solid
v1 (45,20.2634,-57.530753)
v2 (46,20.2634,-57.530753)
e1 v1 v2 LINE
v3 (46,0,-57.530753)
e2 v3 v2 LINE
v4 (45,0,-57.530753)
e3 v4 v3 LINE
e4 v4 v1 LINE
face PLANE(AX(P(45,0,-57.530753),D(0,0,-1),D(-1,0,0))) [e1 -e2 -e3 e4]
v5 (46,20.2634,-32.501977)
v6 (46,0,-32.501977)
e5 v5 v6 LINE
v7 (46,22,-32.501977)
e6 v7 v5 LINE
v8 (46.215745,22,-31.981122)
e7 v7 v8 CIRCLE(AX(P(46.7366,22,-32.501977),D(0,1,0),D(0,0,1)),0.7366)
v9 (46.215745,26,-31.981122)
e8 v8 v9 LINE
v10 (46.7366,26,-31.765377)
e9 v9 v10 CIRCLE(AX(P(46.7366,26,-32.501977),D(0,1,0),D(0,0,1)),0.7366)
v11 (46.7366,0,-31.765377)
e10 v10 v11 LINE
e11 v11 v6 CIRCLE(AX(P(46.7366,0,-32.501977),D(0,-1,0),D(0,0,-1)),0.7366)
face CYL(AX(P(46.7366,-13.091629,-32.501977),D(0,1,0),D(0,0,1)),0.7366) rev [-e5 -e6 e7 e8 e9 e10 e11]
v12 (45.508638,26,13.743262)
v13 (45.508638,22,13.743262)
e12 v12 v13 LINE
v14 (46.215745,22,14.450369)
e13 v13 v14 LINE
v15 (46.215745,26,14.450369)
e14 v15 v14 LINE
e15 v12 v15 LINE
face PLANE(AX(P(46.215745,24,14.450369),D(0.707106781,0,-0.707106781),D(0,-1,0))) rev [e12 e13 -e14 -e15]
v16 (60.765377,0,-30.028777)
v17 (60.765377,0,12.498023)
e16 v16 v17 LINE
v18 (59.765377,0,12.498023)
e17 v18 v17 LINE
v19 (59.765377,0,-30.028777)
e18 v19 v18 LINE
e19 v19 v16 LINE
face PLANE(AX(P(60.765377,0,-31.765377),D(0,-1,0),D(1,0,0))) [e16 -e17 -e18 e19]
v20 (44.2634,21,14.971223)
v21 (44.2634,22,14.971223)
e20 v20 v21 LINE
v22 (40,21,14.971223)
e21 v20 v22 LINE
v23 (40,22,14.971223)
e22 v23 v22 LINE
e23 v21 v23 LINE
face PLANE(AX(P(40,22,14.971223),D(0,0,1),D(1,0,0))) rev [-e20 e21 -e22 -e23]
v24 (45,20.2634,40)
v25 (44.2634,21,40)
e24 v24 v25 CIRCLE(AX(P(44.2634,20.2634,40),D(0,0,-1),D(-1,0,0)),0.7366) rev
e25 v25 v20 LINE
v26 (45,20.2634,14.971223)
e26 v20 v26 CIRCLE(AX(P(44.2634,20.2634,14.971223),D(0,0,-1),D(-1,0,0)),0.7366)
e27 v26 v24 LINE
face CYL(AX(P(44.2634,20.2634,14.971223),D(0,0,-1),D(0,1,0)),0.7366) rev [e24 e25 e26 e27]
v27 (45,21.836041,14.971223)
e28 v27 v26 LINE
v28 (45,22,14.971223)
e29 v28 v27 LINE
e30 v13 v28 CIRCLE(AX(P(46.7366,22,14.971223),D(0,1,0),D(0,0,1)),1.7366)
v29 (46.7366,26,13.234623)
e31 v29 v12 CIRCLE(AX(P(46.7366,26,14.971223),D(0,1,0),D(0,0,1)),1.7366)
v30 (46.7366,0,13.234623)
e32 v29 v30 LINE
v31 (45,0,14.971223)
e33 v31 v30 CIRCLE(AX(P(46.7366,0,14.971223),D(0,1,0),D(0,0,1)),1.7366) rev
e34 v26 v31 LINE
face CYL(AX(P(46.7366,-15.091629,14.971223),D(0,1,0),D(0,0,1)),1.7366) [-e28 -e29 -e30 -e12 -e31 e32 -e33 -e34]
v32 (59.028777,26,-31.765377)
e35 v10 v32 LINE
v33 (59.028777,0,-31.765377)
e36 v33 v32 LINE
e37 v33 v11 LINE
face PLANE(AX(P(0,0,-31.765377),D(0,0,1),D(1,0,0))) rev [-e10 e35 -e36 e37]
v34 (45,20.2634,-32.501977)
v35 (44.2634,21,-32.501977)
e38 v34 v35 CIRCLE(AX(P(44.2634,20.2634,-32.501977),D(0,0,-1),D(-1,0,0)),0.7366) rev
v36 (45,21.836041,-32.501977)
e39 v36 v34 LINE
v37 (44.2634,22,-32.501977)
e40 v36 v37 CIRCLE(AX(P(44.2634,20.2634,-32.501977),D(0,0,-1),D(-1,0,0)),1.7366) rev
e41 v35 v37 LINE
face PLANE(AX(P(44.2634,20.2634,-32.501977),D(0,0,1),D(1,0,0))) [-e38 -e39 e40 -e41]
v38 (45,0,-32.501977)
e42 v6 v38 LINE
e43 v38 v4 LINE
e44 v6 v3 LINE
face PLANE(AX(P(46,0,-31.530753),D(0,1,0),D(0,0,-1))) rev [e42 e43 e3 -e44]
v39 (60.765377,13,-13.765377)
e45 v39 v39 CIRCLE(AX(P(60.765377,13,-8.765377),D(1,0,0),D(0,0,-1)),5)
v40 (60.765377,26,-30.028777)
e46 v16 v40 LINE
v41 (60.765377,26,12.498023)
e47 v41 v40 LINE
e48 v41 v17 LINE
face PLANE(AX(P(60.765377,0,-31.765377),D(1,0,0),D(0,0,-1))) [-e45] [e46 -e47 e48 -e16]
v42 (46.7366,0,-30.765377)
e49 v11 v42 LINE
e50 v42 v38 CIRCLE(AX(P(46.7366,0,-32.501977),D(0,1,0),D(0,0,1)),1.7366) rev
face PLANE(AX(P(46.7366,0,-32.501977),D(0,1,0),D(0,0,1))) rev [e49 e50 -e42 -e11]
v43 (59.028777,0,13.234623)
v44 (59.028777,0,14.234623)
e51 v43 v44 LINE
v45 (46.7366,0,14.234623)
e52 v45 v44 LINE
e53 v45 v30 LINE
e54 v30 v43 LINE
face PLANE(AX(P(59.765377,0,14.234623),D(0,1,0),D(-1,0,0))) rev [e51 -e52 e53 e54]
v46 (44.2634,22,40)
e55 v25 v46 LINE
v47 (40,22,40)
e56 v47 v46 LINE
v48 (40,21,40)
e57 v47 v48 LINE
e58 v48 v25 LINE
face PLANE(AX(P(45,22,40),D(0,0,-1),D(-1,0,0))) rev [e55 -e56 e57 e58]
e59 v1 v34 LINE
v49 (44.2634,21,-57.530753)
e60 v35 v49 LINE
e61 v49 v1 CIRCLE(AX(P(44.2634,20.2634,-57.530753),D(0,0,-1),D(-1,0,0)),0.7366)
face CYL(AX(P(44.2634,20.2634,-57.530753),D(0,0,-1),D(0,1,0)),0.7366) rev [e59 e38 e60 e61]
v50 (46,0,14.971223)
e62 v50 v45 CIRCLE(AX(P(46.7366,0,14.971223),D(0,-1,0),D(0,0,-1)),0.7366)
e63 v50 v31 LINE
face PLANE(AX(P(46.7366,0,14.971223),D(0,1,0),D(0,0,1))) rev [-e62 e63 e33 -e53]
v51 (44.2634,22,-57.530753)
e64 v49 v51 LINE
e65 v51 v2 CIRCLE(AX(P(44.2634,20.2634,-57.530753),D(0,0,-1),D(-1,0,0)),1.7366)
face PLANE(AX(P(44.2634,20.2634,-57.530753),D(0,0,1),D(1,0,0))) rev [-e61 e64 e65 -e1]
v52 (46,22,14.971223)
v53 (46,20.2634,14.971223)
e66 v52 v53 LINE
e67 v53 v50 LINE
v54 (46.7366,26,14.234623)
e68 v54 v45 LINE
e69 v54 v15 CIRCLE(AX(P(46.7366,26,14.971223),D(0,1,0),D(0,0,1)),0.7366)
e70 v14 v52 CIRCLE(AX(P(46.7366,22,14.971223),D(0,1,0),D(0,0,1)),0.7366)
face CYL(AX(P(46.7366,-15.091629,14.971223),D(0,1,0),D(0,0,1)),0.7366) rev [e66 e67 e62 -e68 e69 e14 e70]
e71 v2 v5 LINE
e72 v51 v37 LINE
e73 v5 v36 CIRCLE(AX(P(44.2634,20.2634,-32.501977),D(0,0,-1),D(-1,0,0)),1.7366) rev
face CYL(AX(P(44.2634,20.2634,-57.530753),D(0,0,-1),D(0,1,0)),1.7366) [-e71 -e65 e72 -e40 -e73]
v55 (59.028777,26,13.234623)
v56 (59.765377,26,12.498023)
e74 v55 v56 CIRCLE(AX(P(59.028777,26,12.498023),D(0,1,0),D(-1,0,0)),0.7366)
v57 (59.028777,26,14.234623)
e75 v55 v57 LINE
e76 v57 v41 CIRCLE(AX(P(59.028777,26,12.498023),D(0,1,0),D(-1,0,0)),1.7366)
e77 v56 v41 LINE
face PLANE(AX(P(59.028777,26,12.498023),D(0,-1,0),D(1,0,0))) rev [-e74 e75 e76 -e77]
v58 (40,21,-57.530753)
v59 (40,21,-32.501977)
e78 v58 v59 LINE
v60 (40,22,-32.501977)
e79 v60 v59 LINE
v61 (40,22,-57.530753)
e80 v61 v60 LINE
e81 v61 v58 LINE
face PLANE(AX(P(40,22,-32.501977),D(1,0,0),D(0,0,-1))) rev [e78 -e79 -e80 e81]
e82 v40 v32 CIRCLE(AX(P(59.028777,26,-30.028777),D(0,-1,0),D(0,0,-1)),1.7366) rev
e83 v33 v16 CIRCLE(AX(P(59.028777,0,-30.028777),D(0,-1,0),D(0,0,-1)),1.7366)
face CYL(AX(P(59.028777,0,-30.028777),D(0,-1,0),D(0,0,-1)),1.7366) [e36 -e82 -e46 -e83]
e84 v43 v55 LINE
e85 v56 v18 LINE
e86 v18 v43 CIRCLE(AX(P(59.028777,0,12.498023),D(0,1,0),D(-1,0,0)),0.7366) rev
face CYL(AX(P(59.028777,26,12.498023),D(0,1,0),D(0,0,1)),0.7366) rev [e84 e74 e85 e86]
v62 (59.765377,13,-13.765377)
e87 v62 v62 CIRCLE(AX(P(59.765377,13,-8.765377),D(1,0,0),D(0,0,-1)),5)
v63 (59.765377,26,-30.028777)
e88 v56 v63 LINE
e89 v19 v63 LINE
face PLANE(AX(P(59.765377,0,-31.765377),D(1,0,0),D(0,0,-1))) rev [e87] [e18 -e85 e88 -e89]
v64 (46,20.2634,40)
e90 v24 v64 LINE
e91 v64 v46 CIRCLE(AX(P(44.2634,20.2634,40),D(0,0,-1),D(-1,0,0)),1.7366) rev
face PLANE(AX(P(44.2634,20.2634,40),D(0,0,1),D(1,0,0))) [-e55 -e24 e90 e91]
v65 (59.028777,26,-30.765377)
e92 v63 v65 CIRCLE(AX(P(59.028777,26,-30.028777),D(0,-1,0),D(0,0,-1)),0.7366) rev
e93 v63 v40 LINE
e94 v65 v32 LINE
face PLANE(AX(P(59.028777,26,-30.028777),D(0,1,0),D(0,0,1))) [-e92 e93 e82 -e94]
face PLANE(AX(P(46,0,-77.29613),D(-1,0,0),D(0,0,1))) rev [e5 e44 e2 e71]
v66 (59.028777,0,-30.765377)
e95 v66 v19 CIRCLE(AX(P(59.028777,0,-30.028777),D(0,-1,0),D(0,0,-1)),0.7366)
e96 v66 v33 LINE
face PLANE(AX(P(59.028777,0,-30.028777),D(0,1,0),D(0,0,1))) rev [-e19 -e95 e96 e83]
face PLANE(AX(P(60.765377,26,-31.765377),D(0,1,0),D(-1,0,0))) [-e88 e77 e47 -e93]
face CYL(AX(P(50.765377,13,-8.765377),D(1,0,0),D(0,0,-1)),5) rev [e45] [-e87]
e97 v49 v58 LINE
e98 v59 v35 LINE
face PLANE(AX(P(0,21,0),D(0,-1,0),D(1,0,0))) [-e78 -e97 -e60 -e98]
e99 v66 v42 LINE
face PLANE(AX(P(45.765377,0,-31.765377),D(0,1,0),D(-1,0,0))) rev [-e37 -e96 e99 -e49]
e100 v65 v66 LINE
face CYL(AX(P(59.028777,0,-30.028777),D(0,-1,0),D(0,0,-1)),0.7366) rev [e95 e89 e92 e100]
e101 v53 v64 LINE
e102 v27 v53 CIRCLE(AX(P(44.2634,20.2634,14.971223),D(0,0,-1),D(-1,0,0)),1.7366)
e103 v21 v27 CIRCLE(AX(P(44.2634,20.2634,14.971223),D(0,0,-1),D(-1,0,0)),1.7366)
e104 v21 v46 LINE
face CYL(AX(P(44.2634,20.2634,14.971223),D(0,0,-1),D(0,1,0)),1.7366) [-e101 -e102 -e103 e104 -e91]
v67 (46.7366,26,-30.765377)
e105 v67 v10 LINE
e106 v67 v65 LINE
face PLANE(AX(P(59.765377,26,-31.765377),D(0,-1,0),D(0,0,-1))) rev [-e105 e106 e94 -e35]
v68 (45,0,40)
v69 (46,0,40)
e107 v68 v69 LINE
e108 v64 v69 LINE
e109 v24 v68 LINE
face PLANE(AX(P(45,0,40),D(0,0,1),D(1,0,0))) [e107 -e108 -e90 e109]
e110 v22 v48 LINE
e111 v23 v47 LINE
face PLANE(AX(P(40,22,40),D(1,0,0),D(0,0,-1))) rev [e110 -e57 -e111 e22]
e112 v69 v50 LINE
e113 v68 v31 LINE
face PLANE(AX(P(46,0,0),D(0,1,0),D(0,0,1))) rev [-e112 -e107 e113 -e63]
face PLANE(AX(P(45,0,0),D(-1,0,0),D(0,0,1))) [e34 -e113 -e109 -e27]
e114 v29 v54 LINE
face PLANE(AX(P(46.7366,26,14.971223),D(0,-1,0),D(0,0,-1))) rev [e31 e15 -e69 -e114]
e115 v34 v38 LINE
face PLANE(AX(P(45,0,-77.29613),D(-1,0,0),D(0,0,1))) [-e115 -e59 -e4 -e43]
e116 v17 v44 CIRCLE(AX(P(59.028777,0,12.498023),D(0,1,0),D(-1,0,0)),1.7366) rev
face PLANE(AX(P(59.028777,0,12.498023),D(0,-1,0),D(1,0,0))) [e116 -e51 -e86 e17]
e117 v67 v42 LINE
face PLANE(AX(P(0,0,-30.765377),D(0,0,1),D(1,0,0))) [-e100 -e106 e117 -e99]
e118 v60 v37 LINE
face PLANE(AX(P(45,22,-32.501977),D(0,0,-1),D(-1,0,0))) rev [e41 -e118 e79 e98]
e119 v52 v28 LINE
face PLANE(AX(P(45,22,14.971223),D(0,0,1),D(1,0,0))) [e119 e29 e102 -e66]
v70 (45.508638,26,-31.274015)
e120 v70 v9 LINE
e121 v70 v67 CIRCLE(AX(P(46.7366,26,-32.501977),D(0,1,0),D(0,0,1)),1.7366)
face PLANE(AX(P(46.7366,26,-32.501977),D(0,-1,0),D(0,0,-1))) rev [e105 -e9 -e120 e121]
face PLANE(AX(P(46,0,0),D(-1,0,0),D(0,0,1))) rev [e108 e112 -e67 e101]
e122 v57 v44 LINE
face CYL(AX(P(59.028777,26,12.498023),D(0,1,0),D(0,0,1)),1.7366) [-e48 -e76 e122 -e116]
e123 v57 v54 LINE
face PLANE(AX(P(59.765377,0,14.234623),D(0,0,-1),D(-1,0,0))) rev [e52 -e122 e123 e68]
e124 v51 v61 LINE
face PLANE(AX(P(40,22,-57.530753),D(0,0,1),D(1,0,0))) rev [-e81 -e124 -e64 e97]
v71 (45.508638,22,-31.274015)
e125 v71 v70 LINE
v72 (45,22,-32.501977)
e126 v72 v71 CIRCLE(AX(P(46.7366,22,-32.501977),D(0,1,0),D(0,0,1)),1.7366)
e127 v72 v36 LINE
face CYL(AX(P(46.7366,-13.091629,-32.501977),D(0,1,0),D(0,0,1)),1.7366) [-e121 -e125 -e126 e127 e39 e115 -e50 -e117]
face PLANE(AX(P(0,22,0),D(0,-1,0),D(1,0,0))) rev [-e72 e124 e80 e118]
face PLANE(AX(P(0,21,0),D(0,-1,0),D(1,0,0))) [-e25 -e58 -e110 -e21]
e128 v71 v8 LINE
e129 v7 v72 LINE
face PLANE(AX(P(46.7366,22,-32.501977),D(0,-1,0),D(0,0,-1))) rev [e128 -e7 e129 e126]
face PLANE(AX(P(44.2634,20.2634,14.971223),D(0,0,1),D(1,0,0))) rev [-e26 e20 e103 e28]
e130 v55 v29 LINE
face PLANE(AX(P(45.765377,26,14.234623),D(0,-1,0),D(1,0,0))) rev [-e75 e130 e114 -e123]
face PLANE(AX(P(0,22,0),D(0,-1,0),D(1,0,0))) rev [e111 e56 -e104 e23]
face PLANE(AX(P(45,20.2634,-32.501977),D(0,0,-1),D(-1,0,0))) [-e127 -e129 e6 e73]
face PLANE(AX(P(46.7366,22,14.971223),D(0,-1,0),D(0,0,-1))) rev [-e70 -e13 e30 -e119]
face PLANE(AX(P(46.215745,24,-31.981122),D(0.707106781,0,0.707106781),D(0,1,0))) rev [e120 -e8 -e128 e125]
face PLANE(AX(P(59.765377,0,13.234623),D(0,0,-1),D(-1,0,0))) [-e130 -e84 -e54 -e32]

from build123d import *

# Parameters (mm, degrees)
SKETCH17_W                   = 46
SKETCH17_H                   = 26
BASE_FLANGE4_DEPTH           = 1
EDGE_FLANGE1_STRIP_W         = 5.4732
EDGE_FLANGE1_STRIP_H         = 1
EDGE_FLANGE1_STRIP_CUT_DEPTH = 26
EDGE_FLANGE1_DEPTH           = 26
SKETCH30_W                   = 26
SKETCH30_H                   = 22
TAB1_DEPTH                   = 1
SKETCHED_BEND3_DEPTH         = 26
SKETCHED_START               = 22
SKETCHED_BEND3_2_DEPTH       = 4
SKETCHED_BEND3_3_DEPTH       = 26
SKETCHED_BEND3_4_DEPTH       = 22
EDGE_FLANGE2_STRIP_W         = 5.4732
EDGE_FLANGE2_STRIP_H         = 1
EDGE_FLANGE2_STRIP_CUT_DEPTH = 25.028776631
EDGE_FLANGE2_DEPTH           = 25.028776631
EDGE_FLANGE3_STRIP_W         = 5.4732
EDGE_FLANGE3_STRIP_H         = 1
EDGE_FLANGE3_STRIP_CUT_DEPTH = 26
EDGE_FLANGE3_DEPTH           = 26
SKETCH40_W                   = 26
SKETCH40_H                   = 22
TAB2_DEPTH                   = 1
SKETCHED_BEND4_DEPTH         = 26
SKETCHED_BEND4_2_DEPTH       = 4
SKETCHED_BEND4_3_DEPTH       = 22
SKETCHED_BEND4_4_DEPTH       = 4
EDGE_FLANGE4_STRIP_W         = 5.4732
EDGE_FLANGE4_STRIP_H         = 1
EDGE_FLANGE4_STRIP_CUT_DEPTH = 25.028776631
EDGE_FLANGE4_DEPTH           = 25.028776631
SKETCH47_R                   = 5
CUT_EXTRUDE1_DEPTH           = 10


# Read off the part's stored shape, not the designer's step: Sketched Bend3, Sketched Bend4
# Sheet-metal steps are written as plain solids
with BuildPart() as part:
    # Sketch17 → Base-Flange4 (new body)
    with BuildSketch(Plane.XY):
        with Locations((23, 13)):
            Rectangle(SKETCH17_W, SKETCH17_H)
    extrude(amount=-BASE_FLANGE4_DEPTH)

    # Edge-Flange1 strip (across the edge) → Edge-Flange1 strip cut (cut)
    with BuildSketch(Plane(origin=(46, 0, 0), x_dir=(-1, 0, 0), z_dir=(0, 1, 0))):
        with Locations((-1, -0.5)):
            Rectangle(EDGE_FLANGE1_STRIP_W, EDGE_FLANGE1_STRIP_H)
    extrude(amount=EDGE_FLANGE1_STRIP_CUT_DEPTH, mode=Mode.SUBTRACT)

    # Edge-Flange1 section (across the edge) → Edge-Flange1 (add)
    with BuildSketch(Plane(origin=(46, 0, 0), x_dir=(-1, 0, 0), z_dir=(0, 1, 0))):
        with BuildLine():
            Line((0, 0.7366), (0, 14))
            Line((0, 14), (1, 14))
            Line((1, 14), (1, 0.7366))
            ThreePointArc((1, 0.7366), (1.215745145, 0.215745145), (1.7366, 0))
            Line((1.7366, 0), (1.7366, -1))
            ThreePointArc((1.7366, -1), (0.508638364, -0.491361636), (0, 0.7366))
        make_face()
    extrude(amount=EDGE_FLANGE1_DEPTH)

    # Sketch30 → Tab1 (add)
    with BuildSketch(Plane(origin=(46, 0, 0), x_dir=(0, 0, -1), z_dir=(1, 0, 0))):
        with Locations((-27, 11)):
            Rectangle(SKETCH30_W, SKETCH30_H)
    extrude(amount=-TAB1_DEPTH)

    # Sketched Bend3 outline → Sketched Bend3 (cut)
    with BuildSketch(Plane(origin=(0, 0, 0), x_dir=(1, 0, 0), z_dir=(0, 1, 0))):
        with BuildLine():
            Line((46, -13.398582279), (46, -0.7366))
            ThreePointArc((46, -0.7366), (45.491361636, 0.491361636), (44.2634, 1))
            Line((44.2634, 1), (0, 1))
            Line((0, 1), (0, 0))
            Line((0, 0), (44.2634, 0))
            ThreePointArc((44.2634, 0), (44.784254855, -0.215745145), (45, -0.7366))
            Line((45, -0.7366), (45, -14.971223369))
            ThreePointArc((45, -14.971223369), (45.271171885, -14.039397205), (46, -13.398582279))
        make_face()
    extrude(amount=SKETCHED_BEND3_DEPTH, mode=Mode.SUBTRACT)

    # Sketched Bend3 2 outline → Sketched Bend3 2 (cut)
    with BuildSketch(Plane(origin=(0, 0, 0), x_dir=(1, 0, 0), z_dir=(0, 1, 0)).offset(SKETCHED_START)):
        with BuildLine():
            Line((45.296980354, -14), (45.765376631, -14))
            Line((45.765376631, -14), (45.508638364, -13.743261733))
            ThreePointArc((45.508638364, -13.743261733), (45.396646229, -13.866549911), (45.296980354, -14))
        make_face()
    extrude(amount=SKETCHED_BEND3_2_DEPTH, mode=Mode.SUBTRACT)

    # Sketched Bend3 3 outline → Sketched Bend3 3 (add)
    with BuildSketch(Plane(origin=(0, 0, 0), x_dir=(1, 0, 0), z_dir=(0, 1, 0))):
        with BuildLine():
            Line((46.7366, -14.234623369), (59.028776631, -14.234623369))
            ThreePointArc((59.028776631, -14.234623369), (60.256738267, -13.725985005), (60.765376631, -12.498023369))
            Line((60.765376631, -12.498023369), (60.765376631, 31.765376631))
            Line((60.765376631, 31.765376631), (59.765376631, 31.765376631))
            Line((59.765376631, 31.765376631), (59.765376631, -12.498023369))
            ThreePointArc((59.765376631, -12.498023369), (59.549631486, -13.018878224), (59.028776631, -13.234623369))
            Line((59.028776631, -13.234623369), (46.7366, -13.234623369))
            ThreePointArc((46.7366, -13.234623369), (46.359286442, -13.276108612), (46, -13.398582279))
            Line((46, -13.398582279), (46, -14))
            Line((46, -14), (45.765376631, -14))
            Line((45.765376631, -14), (46.215745145, -14.450368514))
            ThreePointArc((46.215745145, -14.450368514), (46.454715384, -14.290693705), (46.7366, -14.234623369))
        make_face()
    extrude(amount=SKETCHED_BEND3_3_DEPTH)

    # Sketched Bend3 4 outline → Sketched Bend3 4 (add)
    with BuildSketch(Plane(origin=(0, 0, 0), x_dir=(1, 0, 0), z_dir=(0, 1, 0))):
        with BuildLine():
            ThreePointArc((46, -14.971223369), (46.056070336, -14.689338753), (46.215745145, -14.450368514))
            Line((46.215745145, -14.450368514), (46, -14.234623369))
            Line((46, -14.234623369), (46, -14.971223369))
        make_face()
    extrude(amount=SKETCHED_BEND3_4_DEPTH)

    # Edge-Flange2 strip (across the edge) → Edge-Flange2 strip cut (cut)
    with BuildSketch(Plane(origin=(45, 22, 40), x_dir=(0, -1, 0), z_dir=(0, 0, -1))):
        with Locations((-1, -0.5)):
            Rectangle(EDGE_FLANGE2_STRIP_W, EDGE_FLANGE2_STRIP_H)
    extrude(amount=EDGE_FLANGE2_STRIP_CUT_DEPTH, mode=Mode.SUBTRACT)

    # Edge-Flange2 section (across the edge) → Edge-Flange2 (add)
    with BuildSketch(Plane(origin=(45, 22, 40), x_dir=(0, -1, 0), z_dir=(0, 0, -1))):
        with BuildLine():
            Line((0, 0.7366), (0, 5))
            Line((0, 5), (1, 5))
            Line((1, 5), (1, 0.7366))
            ThreePointArc((1, 0.7366), (1.215745145, 0.215745145), (1.7366, 0))
            Line((1.7366, 0), (1.7366, -1))
            ThreePointArc((1.7366, -1), (0.508638364, -0.491361636), (0, 0.7366))
        make_face()
    extrude(amount=EDGE_FLANGE2_DEPTH)

    # Edge-Flange3 strip (across the edge) → Edge-Flange3 strip cut (cut)
    with BuildSketch(Plane(origin=(59.765376631, 26, -31.765376631), x_dir=(0, 0, 1), z_dir=(0, -1, 0))):
        with Locations((-1, -0.5)):
            Rectangle(EDGE_FLANGE3_STRIP_W, EDGE_FLANGE3_STRIP_H)
    extrude(amount=EDGE_FLANGE3_STRIP_CUT_DEPTH, mode=Mode.SUBTRACT)

    # Edge-Flange3 section (across the edge) → Edge-Flange3 (add)
    with BuildSketch(Plane(origin=(59.765376631, 26, -31.765376631), x_dir=(0, 0, 1), z_dir=(0, -1, 0))):
        with BuildLine():
            Line((0, 0.7366), (0, 14))
            Line((0, 14), (1, 14))
            Line((1, 14), (1, 0.7366))
            ThreePointArc((1, 0.7366), (1.215745145, 0.215745145), (1.7366, 0))
            Line((1.7366, 0), (1.7366, -1))
            ThreePointArc((1.7366, -1), (0.508638364, -0.491361636), (0, 0.7366))
        make_face()
    extrude(amount=EDGE_FLANGE3_DEPTH)

    # Sketch40 → Tab2 (add)
    with BuildSketch(Plane(origin=(0, 0, -31.765376631), x_dir=(-1, 0, 0), z_dir=(0, 0, -1))):
        with Locations((-32.765376631, 11)):
            Rectangle(SKETCH40_W, SKETCH40_H)
    extrude(amount=-TAB2_DEPTH)

    # Sketched Bend4 outline → Sketched Bend4 (cut)
    with BuildSketch(Plane(origin=(0, 0, 0), x_dir=(1, 0, 0), z_dir=(0, 1, 0))):
        with BuildLine():
            Line((45.16395891, 31.765376631), (19.765376631, 31.765376631))
            Line((19.765376631, 31.765376631), (19.765376631, 30.765376631))
            Line((19.765376631, 30.765376631), (46.7366, 30.765376631))
            ThreePointArc((46.7366, 30.765376631), (45.804773836, 31.036548516), (45.16395891, 31.765376631))
        make_face()
    extrude(amount=SKETCHED_BEND4_DEPTH, mode=Mode.SUBTRACT)

    # Sketched Bend4 2 outline → Sketched Bend4 2 (cut)
    with BuildSketch(Plane(origin=(0, 0, 0), x_dir=(1, 0, 0), z_dir=(0, 1, 0)).offset(SKETCHED_START)):
        Polygon((45.765376631, 31.530753262), (46, 31.765376631), (45.765376631, 31.765376631), align=None)
    extrude(amount=SKETCHED_BEND4_2_DEPTH, mode=Mode.SUBTRACT)

    # Sketched Bend4 3 outline → Sketched Bend4 3 (add)
    with BuildSketch(Plane(origin=(0, 0, 0), x_dir=(1, 0, 0), z_dir=(0, 1, 0))):
        with BuildLine():
            Line((46, 32.501976631), (46, 57.530753262))
            Line((46, 57.530753262), (45, 57.530753262))
            Line((45, 57.530753262), (45, 32.501976631))
            ThreePointArc((45, 32.501976631), (45.041485243, 32.124663073), (45.16395891, 31.765376631))
            Line((45.16395891, 31.765376631), (46.7366, 31.765376631))
            ThreePointArc((46.7366, 31.765376631), (46.215745145, 31.981121776), (46, 32.501976631))
        make_face()
    extrude(amount=SKETCHED_BEND4_3_DEPTH)

    # Sketched Bend4 4 outline → Sketched Bend4 4 (add)
    with BuildSketch(Plane(origin=(0, 0, 0), x_dir=(1, 0, 0), z_dir=(0, 1, 0)).offset(SKETCHED_START)):
        with BuildLine():
            ThreePointArc((46.7366, 31.765376631), (46.454715384, 31.821446967), (46.215745145, 31.981121776))
            Line((46.215745145, 31.981121776), (46, 31.765376631))
            Line((46, 31.765376631), (46.7366, 31.765376631))
        make_face()
        with BuildLine():
            Line((45.765376631, 31.062356985), (45.765376631, 31.530753262))
            Line((45.765376631, 31.530753262), (45.508638364, 31.274014995))
            ThreePointArc((45.508638364, 31.274014995), (45.631926542, 31.16202286), (45.765376631, 31.062356985))
        make_face()
    extrude(amount=SKETCHED_BEND4_4_DEPTH)

    # Edge-Flange4 strip (across the edge) → Edge-Flange4 strip cut (cut)
    with BuildSketch(Plane(origin=(45, 22, -32.501976631), x_dir=(0, -1, 0), z_dir=(0, 0, -1))):
        with Locations((-1, -0.5)):
            Rectangle(EDGE_FLANGE4_STRIP_W, EDGE_FLANGE4_STRIP_H)
    extrude(amount=EDGE_FLANGE4_STRIP_CUT_DEPTH, mode=Mode.SUBTRACT)

    # Edge-Flange4 section (across the edge) → Edge-Flange4 (add)
    with BuildSketch(Plane(origin=(45, 22, -32.501976631), x_dir=(0, -1, 0), z_dir=(0, 0, -1))):
        with BuildLine():
            Line((0, 0.7366), (0, 5))
            Line((0, 5), (1, 5))
            Line((1, 5), (1, 0.7366))
            ThreePointArc((1, 0.7366), (1.215745145, 0.215745145), (1.7366, 0))
            Line((1.7366, 0), (1.7366, -1))
            ThreePointArc((1.7366, -1), (0.508638364, -0.491361636), (0, 0.7366))
        make_face()
    extrude(amount=EDGE_FLANGE4_DEPTH)

    # Sketch47 → Cut-Extrude1 (cut)
    with BuildSketch(Plane(origin=(60.765376631, 0, 0), x_dir=(0, 0, -1), z_dir=(1, 0, 0))):
        with Locations((8.765376631, 13)):
            Circle(SKETCH47_R)
    extrude(amount=-CUT_EXTRUDE1_DEPTH, mode=Mode.SUBTRACT)


solid = part.part
